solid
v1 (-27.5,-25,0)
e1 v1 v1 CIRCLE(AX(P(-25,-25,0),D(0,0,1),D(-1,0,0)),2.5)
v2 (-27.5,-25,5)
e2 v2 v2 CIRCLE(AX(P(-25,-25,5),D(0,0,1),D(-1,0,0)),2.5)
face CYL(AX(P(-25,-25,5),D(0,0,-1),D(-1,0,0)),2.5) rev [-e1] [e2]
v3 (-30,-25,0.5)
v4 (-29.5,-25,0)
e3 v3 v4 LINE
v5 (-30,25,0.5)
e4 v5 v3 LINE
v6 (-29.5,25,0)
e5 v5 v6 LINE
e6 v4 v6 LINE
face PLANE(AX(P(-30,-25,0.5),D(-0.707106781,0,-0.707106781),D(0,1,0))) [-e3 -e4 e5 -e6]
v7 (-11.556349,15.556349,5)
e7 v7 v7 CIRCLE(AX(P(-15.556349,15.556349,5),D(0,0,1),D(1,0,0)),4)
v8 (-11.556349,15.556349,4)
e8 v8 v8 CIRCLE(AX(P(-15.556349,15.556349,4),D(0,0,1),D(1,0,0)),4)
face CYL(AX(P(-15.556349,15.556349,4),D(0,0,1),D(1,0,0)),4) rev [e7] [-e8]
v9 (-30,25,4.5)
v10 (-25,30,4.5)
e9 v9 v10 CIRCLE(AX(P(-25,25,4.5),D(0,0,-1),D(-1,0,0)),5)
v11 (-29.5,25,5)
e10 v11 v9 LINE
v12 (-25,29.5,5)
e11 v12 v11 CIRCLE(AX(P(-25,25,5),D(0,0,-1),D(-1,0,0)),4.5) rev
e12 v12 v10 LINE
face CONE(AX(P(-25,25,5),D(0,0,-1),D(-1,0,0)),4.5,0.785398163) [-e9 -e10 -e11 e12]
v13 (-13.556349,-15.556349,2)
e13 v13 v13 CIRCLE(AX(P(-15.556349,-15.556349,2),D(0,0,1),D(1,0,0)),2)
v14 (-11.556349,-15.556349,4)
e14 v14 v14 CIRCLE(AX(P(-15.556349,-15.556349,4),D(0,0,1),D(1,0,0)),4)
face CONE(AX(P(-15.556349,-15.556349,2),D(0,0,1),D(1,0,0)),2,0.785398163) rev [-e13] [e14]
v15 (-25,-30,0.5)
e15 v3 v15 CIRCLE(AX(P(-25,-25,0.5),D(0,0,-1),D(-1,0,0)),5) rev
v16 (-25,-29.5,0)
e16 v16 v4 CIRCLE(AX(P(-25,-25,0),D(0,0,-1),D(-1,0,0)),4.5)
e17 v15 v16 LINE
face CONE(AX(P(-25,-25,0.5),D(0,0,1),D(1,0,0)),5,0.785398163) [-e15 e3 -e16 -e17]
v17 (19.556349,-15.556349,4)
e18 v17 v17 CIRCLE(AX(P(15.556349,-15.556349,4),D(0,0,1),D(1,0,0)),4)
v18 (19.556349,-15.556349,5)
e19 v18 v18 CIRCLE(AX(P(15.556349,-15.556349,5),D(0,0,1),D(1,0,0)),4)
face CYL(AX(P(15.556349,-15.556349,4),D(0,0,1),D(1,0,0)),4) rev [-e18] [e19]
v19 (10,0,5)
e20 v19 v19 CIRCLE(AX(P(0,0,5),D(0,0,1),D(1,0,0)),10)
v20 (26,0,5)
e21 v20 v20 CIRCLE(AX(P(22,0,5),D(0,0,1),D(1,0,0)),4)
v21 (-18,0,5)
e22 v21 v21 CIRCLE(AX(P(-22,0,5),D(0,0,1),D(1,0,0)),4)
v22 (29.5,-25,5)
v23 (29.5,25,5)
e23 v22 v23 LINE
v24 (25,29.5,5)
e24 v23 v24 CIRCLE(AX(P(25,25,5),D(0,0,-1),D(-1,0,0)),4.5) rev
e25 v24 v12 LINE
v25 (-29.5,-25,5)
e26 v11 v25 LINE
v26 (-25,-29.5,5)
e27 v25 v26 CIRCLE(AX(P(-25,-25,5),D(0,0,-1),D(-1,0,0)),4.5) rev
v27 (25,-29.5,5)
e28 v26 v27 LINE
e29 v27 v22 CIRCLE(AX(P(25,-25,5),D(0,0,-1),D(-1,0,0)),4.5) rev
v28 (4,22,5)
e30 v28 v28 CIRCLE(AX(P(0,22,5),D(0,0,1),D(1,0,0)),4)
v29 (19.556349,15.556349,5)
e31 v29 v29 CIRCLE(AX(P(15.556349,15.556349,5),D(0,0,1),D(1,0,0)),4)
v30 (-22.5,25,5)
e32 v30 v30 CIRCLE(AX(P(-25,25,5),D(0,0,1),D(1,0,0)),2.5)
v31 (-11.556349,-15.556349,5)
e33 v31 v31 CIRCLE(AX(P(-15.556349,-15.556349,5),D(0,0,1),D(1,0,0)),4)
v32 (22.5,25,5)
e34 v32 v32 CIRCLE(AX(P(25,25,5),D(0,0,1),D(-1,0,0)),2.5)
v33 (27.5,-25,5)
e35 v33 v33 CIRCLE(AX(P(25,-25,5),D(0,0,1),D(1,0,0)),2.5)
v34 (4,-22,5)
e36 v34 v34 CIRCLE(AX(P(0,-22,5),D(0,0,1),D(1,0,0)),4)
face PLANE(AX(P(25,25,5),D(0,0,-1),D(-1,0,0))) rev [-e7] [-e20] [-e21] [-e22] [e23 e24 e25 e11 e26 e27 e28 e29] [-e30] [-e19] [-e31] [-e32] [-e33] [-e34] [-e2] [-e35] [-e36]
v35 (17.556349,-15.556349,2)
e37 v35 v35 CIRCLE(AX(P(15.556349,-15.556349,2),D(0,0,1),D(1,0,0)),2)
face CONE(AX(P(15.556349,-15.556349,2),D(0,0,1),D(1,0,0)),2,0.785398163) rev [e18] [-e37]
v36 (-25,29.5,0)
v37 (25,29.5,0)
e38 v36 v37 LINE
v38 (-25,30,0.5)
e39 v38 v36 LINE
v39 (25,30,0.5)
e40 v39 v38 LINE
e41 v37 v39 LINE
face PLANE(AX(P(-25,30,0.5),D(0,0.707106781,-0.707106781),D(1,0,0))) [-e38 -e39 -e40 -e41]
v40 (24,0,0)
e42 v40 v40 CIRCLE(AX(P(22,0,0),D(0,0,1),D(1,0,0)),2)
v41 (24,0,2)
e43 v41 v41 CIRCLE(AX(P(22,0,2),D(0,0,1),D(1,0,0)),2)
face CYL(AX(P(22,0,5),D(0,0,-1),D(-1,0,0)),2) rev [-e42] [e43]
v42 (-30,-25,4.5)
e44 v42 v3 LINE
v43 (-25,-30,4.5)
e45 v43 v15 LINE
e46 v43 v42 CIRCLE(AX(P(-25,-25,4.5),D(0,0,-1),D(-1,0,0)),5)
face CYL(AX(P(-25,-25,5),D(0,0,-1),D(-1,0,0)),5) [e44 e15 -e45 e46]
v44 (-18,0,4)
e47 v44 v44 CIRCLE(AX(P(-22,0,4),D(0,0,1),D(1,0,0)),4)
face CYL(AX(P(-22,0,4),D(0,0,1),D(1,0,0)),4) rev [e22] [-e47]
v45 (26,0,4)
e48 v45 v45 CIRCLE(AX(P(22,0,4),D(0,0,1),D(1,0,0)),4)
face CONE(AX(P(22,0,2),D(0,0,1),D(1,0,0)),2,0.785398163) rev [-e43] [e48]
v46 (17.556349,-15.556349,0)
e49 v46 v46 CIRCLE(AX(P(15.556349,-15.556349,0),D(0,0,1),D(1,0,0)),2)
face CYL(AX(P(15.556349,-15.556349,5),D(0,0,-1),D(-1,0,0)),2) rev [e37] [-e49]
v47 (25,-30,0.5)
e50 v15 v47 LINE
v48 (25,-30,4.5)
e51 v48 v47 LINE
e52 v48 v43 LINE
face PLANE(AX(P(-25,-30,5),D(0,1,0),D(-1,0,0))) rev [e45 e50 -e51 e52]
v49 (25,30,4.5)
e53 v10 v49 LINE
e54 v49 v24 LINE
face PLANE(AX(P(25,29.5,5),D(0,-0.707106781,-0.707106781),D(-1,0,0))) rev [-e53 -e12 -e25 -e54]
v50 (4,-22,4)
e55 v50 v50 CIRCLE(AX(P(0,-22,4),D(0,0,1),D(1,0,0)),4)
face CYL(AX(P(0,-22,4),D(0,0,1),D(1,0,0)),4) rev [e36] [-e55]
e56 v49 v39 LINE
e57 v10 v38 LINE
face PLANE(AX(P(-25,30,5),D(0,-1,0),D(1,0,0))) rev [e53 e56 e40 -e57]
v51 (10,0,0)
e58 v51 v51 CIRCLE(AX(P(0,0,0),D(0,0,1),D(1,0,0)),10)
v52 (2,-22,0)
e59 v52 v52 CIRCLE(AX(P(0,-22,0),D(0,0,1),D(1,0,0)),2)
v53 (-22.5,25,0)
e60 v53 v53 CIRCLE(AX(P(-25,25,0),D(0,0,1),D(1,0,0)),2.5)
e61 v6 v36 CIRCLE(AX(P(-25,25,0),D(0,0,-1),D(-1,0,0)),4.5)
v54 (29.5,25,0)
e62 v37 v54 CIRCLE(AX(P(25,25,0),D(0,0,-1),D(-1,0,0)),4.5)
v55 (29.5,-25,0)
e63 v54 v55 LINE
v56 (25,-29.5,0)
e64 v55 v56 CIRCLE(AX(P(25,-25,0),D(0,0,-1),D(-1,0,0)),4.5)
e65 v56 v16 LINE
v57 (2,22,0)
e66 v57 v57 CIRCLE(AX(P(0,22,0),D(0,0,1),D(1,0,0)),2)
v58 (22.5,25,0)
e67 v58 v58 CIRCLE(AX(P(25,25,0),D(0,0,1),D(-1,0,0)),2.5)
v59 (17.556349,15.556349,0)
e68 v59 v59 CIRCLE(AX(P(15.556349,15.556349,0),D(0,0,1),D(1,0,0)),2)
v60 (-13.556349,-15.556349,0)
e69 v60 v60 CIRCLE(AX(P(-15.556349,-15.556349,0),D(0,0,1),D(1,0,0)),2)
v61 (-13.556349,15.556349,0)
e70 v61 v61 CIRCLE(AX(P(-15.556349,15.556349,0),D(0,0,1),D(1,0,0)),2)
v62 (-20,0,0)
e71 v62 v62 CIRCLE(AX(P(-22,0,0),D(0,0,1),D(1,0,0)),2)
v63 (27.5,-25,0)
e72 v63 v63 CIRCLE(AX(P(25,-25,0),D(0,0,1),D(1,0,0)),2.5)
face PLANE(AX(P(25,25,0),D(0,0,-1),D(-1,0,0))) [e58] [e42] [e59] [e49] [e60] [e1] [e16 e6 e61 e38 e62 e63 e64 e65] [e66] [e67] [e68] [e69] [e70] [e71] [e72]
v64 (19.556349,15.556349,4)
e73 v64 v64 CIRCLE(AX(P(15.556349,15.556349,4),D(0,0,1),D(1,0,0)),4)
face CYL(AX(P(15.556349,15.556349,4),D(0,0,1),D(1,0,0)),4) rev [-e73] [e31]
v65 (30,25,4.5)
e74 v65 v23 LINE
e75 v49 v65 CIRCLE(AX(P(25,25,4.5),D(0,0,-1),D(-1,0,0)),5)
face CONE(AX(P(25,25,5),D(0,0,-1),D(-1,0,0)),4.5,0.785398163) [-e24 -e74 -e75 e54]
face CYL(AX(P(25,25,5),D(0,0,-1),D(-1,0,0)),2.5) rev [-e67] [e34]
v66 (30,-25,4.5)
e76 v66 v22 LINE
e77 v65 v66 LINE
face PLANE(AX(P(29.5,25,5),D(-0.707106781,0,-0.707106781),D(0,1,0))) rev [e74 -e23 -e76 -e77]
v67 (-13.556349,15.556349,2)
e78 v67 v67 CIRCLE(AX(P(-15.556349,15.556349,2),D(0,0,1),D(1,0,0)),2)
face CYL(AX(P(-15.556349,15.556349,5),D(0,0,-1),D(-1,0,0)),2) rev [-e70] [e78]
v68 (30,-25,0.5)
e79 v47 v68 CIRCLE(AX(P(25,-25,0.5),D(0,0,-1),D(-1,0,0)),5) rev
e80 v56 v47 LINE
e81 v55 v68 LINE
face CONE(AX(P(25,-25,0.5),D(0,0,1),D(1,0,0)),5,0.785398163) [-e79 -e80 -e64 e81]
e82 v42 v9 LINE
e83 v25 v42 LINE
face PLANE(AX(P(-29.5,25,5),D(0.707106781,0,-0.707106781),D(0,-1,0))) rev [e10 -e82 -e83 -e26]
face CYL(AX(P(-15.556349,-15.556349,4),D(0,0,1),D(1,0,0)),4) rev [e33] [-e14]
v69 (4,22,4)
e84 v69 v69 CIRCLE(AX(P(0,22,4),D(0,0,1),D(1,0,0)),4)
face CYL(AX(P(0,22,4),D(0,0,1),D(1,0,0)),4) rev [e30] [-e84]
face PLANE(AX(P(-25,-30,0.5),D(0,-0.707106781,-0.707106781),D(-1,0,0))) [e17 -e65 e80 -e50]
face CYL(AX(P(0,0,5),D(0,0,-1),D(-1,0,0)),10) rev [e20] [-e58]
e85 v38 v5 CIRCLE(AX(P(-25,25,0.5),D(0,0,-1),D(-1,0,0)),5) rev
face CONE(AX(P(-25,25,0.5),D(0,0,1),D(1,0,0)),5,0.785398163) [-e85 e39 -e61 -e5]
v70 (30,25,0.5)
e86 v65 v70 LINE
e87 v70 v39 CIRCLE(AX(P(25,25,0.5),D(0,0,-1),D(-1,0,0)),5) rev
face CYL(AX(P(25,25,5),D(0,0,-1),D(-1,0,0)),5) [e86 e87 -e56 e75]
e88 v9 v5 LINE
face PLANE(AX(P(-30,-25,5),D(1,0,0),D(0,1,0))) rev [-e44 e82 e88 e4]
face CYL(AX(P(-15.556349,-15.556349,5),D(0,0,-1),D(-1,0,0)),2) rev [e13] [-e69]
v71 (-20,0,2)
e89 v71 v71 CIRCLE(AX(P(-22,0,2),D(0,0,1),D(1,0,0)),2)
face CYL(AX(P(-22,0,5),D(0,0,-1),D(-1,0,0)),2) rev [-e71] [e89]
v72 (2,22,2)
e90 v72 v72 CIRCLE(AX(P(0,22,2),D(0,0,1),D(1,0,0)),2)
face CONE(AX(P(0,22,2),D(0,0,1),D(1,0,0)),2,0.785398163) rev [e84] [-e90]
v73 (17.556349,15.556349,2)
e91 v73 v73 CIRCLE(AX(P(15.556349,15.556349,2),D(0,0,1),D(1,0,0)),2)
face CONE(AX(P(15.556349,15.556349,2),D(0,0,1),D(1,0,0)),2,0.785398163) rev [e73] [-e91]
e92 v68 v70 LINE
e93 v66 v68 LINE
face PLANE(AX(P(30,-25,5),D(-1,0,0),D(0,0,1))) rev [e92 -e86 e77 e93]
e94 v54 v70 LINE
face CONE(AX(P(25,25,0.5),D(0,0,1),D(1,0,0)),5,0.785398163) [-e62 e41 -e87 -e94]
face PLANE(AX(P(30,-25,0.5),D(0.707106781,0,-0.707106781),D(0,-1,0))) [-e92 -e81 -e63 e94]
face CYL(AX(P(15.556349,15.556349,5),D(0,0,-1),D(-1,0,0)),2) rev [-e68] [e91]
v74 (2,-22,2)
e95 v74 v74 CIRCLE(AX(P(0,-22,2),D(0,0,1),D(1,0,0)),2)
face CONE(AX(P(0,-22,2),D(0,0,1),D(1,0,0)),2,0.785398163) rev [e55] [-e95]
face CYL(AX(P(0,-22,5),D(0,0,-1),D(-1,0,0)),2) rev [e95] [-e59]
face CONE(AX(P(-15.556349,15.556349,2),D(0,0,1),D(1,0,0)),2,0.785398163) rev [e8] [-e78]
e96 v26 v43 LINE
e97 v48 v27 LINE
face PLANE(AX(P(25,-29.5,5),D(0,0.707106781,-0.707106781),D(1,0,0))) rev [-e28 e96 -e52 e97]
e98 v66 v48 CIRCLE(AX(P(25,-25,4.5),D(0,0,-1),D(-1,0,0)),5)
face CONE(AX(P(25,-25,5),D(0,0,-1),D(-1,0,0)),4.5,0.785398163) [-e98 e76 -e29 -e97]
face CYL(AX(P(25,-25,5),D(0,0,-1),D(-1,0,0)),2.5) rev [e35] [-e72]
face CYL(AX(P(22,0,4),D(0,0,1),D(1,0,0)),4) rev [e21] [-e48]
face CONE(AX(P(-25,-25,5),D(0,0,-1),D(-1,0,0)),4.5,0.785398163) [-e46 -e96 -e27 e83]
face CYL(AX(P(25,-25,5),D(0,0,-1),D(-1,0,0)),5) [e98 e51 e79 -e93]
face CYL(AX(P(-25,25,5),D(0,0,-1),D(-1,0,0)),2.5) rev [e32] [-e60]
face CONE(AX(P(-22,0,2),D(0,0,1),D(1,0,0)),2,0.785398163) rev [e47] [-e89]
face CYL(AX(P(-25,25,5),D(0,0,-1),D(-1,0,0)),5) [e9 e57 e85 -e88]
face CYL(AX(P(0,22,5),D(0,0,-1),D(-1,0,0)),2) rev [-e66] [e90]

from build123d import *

# Parameters (mm, degrees)
SKETCH_1_R          = 2.5
SKETCH_1_R_2        = 10
SKETCH_1_R_3        = 2
EXTRUDE_1_DEPTH     = 5
SKETCH_2_R          = 4
CUT_EXTRUDE_1_DEPTH = 1
CHAMFER_1_SIZE      = 2
CHAMFER1_SIZE       = 0.5


with BuildPart() as part:
    # 草图1 → 凸台-拉伸1 (new body)
    with BuildSketch(Plane.XY):
        with BuildLine():
            Line((-25, -30), (25, -30))
            ThreePointArc((25, -30), (28.535533906, -28.535533906), (30, -25))
            Line((30, -25), (30, 25))
            ThreePointArc((30, 25), (28.535533906, 28.535533906), (25, 30))
            Line((25, 30), (-25, 30))
            ThreePointArc((-25, 30), (-28.535533906, 28.535533906), (-30, 25))
            Line((-30, 25), (-30, -25))
            ThreePointArc((-30, -25), (-28.535533906, -28.535533906), (-25, -30))
        make_face()
        with Locations((-25, 25)):
            Circle(SKETCH_1_R, mode=Mode.SUBTRACT)
        with Locations(Location((-25, -25, 0), (0, 0, 180))):
            Circle(SKETCH_1_R, mode=Mode.SUBTRACT)
        with Locations((25, -25)):
            Circle(SKETCH_1_R, mode=Mode.SUBTRACT)
        with Locations(Location((25, 25, 0), (0, 0, 180))):
            Circle(SKETCH_1_R, mode=Mode.SUBTRACT)
        Circle(SKETCH_1_R_2, mode=Mode.SUBTRACT)
        with Locations((-15.556349186, 15.556349186)):
            Circle(SKETCH_1_R_3, mode=Mode.SUBTRACT)
        with Locations((0, 22)):
            Circle(SKETCH_1_R_3, mode=Mode.SUBTRACT)
        with Locations((15.556349186, 15.556349186)):
            Circle(SKETCH_1_R_3, mode=Mode.SUBTRACT)
        with Locations((22, 0)):
            Circle(SKETCH_1_R_3, mode=Mode.SUBTRACT)
        with Locations((15.556349186, -15.556349186)):
            Circle(SKETCH_1_R_3, mode=Mode.SUBTRACT)
        with Locations((0, -22)):
            Circle(SKETCH_1_R_3, mode=Mode.SUBTRACT)
        with Locations((-15.556349186, -15.556349186)):
            Circle(SKETCH_1_R_3, mode=Mode.SUBTRACT)
        with Locations((-22, 0)):
            Circle(SKETCH_1_R_3, mode=Mode.SUBTRACT)
    extrude(amount=EXTRUDE_1_DEPTH)

    # 草图2 → 切除-拉伸1 (cut)
    with BuildSketch(Plane.XY.offset(5)):
        with Locations((-15.556349186, 15.556349186)):
            Circle(SKETCH_2_R)
        with Locations((0, 22)):
            Circle(SKETCH_2_R)
        with Locations((15.556349186, 15.556349186)):
            Circle(SKETCH_2_R)
        with Locations((22, 0)):
            Circle(SKETCH_2_R)
        with Locations((15.556349186, -15.556349186)):
            Circle(SKETCH_2_R)
        with Locations((0, -22)):
            Circle(SKETCH_2_R)
        with Locations((-15.556349186, -15.556349186)):
            Circle(SKETCH_2_R)
        with Locations((-22, 0)):
            Circle(SKETCH_2_R)
    extrude(amount=-CUT_EXTRUDE_1_DEPTH, mode=Mode.SUBTRACT)

    # 倒角1
    chamfer_1_edges = [part.edges().sort_by_distance(p)[0] for p in [
        (13.556349186, -15.556349186, 4),
        (20, 0, 4),
        (13.556349186, 15.556349186, 4),
        (-2, 22, 4),
        (-17.556349186, 15.556349186, 4),
        (-24, 0, 4),
        (-17.556349186, -15.556349186, 4),
        (-2, -22, 4),
    ]]
    chamfer(chamfer_1_edges, length=CHAMFER_1_SIZE - 0.0001)  # a hair under: the kernel refuses the full size

    # Chamfer1
    chamfer1_edges = [part.edges().sort_by_distance(p)[0] for p in [
        (-30, 0, 0),
        (-28.535533906, 28.535533906, 0),
        (0, 30, 0),
        (28.535533906, 28.535533906, 0),
        (-28.535533906, 28.535533906, 5),
        (-30, 0, 5),
        (-28.535533906, -28.535533906, 5),
        (0, -30, 5),
        (28.535533906, -28.535533906, 5),
        (30, 0, 5),
        (28.535533906, 28.535533906, 5),
        (30, 0, 0),
        (0, 30, 5),
        (28.535533906, -28.535533906, 0),
        (0, -30, 0),
        (-28.535533906, -28.535533906, 0),
    ]]
    chamfer(chamfer1_edges, length=CHAMFER1_SIZE)


solid = part.part
